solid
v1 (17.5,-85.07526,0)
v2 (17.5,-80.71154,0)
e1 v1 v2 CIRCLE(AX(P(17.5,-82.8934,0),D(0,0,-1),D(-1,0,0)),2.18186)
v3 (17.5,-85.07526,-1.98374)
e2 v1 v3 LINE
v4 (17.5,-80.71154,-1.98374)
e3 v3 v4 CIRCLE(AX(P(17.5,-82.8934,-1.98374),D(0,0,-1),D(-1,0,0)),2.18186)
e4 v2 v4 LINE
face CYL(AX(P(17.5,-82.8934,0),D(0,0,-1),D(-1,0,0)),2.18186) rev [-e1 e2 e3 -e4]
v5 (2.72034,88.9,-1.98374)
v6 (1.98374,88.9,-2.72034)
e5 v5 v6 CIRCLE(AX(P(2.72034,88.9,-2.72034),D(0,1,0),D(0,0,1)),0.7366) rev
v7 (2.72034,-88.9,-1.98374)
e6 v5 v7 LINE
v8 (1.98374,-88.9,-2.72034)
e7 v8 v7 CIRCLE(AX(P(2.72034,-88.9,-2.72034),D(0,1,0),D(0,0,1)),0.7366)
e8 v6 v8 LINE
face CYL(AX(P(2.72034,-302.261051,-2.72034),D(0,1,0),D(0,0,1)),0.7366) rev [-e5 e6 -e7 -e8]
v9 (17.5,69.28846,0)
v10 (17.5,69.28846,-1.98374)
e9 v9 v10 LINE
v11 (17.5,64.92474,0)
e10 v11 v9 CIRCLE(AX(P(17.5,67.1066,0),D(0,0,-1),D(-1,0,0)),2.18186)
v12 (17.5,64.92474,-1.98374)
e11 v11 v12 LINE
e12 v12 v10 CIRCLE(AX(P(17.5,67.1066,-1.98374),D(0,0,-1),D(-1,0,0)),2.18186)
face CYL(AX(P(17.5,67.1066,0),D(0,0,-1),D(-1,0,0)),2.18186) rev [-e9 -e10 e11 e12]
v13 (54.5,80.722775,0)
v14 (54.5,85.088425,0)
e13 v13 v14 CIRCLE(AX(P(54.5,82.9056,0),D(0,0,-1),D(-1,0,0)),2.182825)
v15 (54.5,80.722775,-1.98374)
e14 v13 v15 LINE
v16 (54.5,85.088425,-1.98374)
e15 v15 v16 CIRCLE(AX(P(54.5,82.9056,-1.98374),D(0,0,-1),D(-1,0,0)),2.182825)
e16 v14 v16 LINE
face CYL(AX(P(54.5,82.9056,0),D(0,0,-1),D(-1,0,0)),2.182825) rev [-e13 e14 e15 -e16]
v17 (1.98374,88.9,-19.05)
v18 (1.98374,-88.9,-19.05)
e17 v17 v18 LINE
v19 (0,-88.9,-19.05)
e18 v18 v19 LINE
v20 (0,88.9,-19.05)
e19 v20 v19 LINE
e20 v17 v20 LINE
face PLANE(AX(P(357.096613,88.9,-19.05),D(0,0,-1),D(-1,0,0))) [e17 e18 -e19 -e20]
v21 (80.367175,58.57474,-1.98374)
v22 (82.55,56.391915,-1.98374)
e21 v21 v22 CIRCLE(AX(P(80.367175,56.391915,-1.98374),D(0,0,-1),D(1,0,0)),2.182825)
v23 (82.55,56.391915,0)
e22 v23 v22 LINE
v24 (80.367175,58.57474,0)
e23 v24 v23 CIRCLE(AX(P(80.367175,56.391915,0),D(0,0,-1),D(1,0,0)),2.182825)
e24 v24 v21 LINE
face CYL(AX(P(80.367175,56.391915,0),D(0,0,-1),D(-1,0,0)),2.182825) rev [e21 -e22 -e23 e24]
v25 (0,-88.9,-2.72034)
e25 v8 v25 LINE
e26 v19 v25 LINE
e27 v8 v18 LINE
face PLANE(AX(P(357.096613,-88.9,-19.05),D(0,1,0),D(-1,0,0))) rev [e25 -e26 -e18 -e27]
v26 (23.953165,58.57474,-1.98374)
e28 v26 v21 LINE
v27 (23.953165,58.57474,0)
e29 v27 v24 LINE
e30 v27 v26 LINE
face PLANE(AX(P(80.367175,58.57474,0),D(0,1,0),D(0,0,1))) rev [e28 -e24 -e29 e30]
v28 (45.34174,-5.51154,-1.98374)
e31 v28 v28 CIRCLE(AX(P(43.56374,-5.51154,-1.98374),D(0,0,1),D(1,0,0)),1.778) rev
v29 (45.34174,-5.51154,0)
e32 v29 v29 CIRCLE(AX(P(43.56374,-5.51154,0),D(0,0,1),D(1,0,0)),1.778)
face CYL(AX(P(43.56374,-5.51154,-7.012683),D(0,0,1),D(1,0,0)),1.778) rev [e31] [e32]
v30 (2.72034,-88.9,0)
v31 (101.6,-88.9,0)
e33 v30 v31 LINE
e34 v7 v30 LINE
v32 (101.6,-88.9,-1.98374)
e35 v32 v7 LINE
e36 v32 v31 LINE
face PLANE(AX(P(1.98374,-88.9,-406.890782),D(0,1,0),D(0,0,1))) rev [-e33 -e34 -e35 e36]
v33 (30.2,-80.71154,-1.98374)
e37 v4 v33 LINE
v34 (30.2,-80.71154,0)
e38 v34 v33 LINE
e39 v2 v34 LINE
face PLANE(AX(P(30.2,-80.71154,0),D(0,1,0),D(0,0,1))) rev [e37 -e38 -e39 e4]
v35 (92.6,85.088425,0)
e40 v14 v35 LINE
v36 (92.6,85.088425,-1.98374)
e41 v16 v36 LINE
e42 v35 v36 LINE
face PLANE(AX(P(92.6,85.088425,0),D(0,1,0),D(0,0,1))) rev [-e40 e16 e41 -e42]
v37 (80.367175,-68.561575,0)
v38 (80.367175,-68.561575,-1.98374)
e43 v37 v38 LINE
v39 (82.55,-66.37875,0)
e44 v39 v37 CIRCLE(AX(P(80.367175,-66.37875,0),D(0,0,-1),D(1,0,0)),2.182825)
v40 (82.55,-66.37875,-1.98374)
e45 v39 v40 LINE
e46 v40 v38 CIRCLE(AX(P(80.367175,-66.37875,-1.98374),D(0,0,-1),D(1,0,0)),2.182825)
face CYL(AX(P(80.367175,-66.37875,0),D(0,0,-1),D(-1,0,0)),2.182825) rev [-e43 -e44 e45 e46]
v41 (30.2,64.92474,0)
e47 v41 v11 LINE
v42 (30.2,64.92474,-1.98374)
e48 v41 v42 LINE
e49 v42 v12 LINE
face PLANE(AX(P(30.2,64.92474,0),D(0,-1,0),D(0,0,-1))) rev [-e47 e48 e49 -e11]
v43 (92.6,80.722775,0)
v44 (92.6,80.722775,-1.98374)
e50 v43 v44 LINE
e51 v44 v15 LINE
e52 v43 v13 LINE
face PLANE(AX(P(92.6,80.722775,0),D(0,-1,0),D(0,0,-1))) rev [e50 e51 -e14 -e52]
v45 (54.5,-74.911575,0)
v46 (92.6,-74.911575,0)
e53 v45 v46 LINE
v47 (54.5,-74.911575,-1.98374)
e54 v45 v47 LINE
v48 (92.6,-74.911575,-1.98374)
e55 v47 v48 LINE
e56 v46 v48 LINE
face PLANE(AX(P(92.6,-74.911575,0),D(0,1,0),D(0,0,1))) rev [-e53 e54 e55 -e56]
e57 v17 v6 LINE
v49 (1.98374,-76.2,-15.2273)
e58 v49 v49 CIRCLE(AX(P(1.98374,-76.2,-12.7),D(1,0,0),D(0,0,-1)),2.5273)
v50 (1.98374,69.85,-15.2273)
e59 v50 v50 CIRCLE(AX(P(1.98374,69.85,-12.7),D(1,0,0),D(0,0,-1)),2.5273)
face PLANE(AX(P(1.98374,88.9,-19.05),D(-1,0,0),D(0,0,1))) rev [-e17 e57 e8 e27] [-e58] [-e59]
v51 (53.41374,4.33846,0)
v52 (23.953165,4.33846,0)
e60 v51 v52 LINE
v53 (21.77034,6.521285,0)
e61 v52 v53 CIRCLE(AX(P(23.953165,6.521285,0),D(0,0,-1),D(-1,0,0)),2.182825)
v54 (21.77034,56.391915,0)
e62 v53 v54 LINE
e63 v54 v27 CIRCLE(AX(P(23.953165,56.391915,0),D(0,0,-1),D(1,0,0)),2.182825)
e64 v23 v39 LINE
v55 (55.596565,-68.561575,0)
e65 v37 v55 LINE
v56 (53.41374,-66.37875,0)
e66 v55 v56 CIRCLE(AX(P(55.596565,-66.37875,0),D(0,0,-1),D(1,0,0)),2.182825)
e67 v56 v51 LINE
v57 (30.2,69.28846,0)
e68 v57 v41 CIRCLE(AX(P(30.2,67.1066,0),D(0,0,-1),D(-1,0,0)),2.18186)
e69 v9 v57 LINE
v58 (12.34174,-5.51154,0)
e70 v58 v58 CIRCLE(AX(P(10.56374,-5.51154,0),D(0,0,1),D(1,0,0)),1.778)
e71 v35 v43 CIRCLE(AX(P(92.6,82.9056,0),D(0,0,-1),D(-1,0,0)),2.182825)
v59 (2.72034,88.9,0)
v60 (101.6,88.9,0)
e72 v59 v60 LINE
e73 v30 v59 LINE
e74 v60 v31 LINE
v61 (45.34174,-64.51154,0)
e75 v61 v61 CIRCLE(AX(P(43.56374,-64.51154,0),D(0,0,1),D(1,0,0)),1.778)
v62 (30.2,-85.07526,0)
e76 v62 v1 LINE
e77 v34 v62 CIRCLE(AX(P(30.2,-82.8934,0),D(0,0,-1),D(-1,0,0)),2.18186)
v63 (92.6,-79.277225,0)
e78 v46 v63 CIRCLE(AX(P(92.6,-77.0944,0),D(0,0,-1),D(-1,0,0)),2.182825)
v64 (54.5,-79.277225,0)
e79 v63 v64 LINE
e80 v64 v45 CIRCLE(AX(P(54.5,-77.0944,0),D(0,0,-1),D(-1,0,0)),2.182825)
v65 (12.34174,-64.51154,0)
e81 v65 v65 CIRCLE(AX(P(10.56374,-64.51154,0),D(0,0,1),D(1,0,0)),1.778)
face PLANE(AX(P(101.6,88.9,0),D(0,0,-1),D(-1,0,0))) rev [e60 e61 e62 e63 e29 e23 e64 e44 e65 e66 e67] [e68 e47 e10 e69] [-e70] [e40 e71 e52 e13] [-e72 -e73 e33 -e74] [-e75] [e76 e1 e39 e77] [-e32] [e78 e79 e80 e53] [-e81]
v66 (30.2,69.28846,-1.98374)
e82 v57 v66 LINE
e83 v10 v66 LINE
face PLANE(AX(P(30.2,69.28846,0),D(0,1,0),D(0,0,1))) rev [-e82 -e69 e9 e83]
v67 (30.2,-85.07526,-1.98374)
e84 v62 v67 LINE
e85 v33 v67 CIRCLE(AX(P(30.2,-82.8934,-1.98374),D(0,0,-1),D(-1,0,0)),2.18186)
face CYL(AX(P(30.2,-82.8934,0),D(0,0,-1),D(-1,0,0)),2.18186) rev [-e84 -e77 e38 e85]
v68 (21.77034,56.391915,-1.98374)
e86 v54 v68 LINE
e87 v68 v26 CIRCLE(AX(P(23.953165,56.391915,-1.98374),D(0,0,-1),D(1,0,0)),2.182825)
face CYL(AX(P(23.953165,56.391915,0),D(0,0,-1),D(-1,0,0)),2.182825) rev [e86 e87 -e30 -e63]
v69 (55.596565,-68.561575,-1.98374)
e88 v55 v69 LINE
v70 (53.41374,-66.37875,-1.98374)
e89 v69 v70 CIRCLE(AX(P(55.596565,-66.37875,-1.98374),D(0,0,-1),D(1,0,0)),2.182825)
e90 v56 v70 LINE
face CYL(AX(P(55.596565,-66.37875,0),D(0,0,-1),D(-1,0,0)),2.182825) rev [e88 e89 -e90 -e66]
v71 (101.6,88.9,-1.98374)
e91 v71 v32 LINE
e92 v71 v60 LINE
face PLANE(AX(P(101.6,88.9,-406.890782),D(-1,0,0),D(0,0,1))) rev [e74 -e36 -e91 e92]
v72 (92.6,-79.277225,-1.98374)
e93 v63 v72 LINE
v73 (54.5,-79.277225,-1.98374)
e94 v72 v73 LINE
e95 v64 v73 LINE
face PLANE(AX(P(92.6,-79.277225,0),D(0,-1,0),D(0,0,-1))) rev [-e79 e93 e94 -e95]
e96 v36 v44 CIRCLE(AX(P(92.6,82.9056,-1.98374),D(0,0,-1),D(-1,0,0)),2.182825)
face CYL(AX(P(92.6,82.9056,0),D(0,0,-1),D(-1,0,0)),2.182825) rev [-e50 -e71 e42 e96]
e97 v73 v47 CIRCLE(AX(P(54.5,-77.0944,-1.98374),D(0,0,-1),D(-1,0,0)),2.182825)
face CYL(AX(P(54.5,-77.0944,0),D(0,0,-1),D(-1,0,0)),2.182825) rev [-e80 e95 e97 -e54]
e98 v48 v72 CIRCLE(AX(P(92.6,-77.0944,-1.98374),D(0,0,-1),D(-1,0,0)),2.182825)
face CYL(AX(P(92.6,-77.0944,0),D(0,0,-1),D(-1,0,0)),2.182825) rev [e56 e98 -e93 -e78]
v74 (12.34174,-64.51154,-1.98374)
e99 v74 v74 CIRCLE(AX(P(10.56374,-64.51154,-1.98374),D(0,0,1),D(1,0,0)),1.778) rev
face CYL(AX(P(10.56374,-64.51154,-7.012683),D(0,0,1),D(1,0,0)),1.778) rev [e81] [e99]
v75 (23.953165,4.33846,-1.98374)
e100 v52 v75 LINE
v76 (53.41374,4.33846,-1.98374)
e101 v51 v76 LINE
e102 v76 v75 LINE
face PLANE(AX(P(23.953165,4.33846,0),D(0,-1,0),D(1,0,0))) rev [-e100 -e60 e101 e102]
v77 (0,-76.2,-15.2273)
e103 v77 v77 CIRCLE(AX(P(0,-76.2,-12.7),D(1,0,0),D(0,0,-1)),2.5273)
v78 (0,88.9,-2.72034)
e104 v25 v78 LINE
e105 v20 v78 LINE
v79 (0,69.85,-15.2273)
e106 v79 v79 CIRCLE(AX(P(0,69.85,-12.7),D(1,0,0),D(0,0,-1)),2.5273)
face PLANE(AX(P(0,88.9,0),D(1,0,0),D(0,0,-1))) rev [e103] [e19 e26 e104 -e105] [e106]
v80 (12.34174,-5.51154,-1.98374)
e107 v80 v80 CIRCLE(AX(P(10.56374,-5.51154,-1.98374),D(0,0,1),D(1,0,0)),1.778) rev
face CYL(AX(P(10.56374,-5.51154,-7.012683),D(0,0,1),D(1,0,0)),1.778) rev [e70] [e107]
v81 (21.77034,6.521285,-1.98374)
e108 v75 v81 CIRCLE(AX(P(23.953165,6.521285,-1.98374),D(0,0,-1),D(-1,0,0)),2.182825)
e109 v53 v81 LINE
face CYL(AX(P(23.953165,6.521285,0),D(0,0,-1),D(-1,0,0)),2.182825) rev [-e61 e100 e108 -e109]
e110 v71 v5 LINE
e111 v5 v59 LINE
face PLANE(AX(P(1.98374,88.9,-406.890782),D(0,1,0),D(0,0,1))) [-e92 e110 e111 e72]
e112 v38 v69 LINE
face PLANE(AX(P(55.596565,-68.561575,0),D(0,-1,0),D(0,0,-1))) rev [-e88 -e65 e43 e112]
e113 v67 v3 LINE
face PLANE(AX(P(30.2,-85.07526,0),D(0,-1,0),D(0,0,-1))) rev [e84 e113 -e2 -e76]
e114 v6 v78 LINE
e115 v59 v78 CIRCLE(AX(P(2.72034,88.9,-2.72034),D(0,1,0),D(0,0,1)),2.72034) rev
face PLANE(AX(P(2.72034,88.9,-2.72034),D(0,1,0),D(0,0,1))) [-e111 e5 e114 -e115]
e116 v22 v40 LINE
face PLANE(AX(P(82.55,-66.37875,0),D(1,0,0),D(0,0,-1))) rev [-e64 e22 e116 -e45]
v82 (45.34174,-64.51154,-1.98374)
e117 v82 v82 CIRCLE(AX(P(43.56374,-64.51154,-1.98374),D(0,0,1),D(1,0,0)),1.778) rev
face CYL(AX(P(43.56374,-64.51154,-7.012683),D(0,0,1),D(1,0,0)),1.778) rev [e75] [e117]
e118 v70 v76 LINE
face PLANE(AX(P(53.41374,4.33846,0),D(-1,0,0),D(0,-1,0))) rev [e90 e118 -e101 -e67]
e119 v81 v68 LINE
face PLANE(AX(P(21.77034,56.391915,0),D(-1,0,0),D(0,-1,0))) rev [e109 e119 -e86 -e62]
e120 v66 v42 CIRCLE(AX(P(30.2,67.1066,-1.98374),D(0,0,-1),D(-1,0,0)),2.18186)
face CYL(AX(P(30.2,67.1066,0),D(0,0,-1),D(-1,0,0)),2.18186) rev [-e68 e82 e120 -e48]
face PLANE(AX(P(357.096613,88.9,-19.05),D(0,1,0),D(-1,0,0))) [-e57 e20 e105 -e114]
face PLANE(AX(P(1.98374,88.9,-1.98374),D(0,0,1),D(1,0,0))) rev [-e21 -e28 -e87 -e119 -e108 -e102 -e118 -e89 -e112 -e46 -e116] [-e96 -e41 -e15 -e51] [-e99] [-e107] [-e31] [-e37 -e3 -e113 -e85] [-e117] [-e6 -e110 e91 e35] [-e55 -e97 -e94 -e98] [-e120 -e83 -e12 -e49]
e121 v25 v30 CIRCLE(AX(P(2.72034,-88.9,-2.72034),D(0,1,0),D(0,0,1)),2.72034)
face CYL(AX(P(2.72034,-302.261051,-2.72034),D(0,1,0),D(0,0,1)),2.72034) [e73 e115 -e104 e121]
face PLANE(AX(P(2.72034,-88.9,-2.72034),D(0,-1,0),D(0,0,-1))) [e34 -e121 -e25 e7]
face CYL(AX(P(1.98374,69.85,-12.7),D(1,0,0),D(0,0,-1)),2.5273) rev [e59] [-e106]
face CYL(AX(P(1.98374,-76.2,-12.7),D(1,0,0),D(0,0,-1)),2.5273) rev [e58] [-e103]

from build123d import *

# Parameters (mm, degrees)
BOSS_EXTRUDE1_DEPTH        = 88.9
FLATTEN_BENDS1_START       = -88.9
FLATTEN_BENDS1_OUTLINE_W   = 1.98374
FLATTEN_BENDS1_OUTLINE_H   = 17.06626
FLATTEN_BENDS1_DEPTH       = 177.8
FLATTEN_BENDS1_2_OUTLINE_W = 16.324394327
FLATTEN_BENDS1_2_OUTLINE_H = 1.98374
FLATTEN_BENDS1_2_DEPTH     = 177.8
PROCESS_BENDS1_START       = -88.9
PROCESS_BENDS1_DEPTH       = 177.8
PROCESS_BENDS1_2_DEPTH     = 177.8
CUT_EXTRUDE1_DEPTH         = 137.077284035
F_8_0_199_DIAMETER_HOLE1_D = 5.0546
SKETCH14_R                 = 1.778
CUT_EXTRUDE2_DEPTH         = 1.98374


# Read off the part's stored shape, not the designer's step: Flatten-Bends1, Process-Bends1
with BuildPart() as part:
    # Sketch1 → Boss-Extrude1 (new, symmetric)
    with BuildSketch(Plane(origin=(0, 0, 0), x_dir=(1, 0, 0), z_dir=(0, 1, 0))):
        Polygon((0, 0), (0, 19.05), (1.98374, 19.05), (1.98374, 1.98374), (101.6, 1.98374), (101.6, 0), align=None)
    extrude(amount=BOSS_EXTRUDE1_DEPTH, both=True)

    # Flatten-Bends1 outline → Flatten-Bends1 (cut)
    with BuildSketch(Plane(origin=(0, 0, 0), x_dir=(1, 0, 0), z_dir=(0, 1, 0)).offset(FLATTEN_BENDS1_START)):
        with Locations((0.99187, 10.51687)):
            Rectangle(FLATTEN_BENDS1_OUTLINE_W, FLATTEN_BENDS1_OUTLINE_H)
    extrude(amount=FLATTEN_BENDS1_DEPTH, mode=Mode.SUBTRACT)

    # Flatten-Bends1 2 outline → Flatten-Bends1 2 (add)
    with BuildSketch(Plane(origin=(0, 0, 0), x_dir=(1, 0, 0), z_dir=(0, 1, 0)).offset(FLATTEN_BENDS1_START)):
        with Locations((-8.162197164, 0.99187)):
            Rectangle(FLATTEN_BENDS1_2_OUTLINE_W, FLATTEN_BENDS1_2_OUTLINE_H)
    extrude(amount=FLATTEN_BENDS1_2_DEPTH)

    # Process-Bends1 outline → Process-Bends1 (cut)
    with BuildSketch(Plane(origin=(0, 0, 0), x_dir=(1, 0, 0), z_dir=(0, 1, 0)).offset(PROCESS_BENDS1_START)):
        with BuildLine():
            ThreePointArc((2.72034, 0), (1.077712947, 0.551924431), (0.101624637, 1.98374))
            Line((0.101624637, 1.98374), (-16.324394327, 1.98374))
            Line((-16.324394327, 1.98374), (-16.324394327, 0))
            Line((-16.324394327, 0), (2.72034, 0))
        make_face()
    extrude(amount=PROCESS_BENDS1_DEPTH, mode=Mode.SUBTRACT)

    # Process-Bends1 2 outline → Process-Bends1 2 (add)
    with BuildSketch(Plane(origin=(0, 0, 0), x_dir=(1, 0, 0), z_dir=(0, 1, 0)).offset(PROCESS_BENDS1_START)):
        with BuildLine():
            Line((1.98374, 2.72034), (1.98374, 19.05))
            Line((1.98374, 19.05), (0, 19.05))
            Line((0, 19.05), (0, 2.72034))
            ThreePointArc((0, 2.72034), (0.025525919, 2.348551375), (0.101624637, 1.98374))
            Line((0.101624637, 1.98374), (2.72034, 1.98374))
            ThreePointArc((2.72034, 1.98374), (2.199485145, 2.199485145), (1.98374, 2.72034))
        make_face()
    extrude(amount=PROCESS_BENDS1_2_DEPTH)

    # Sketch6 → Cut-Extrude1 (cut, through all)
    with BuildSketch(Plane(origin=(0, 0, -1.98374), x_dir=(-1, 0, 0), z_dir=(0, 0, -1))):
        with BuildLine():
            Line((-92.60000004, -74.9115748), (-54.50000004, -74.9115748))
            ThreePointArc((-54.50000004, -74.9115748), (-52.31717484, -77.0944), (-54.50000004, -79.2772252))
            Line((-54.50000004, -79.2772252), (-92.60000004, -79.2772252))
            ThreePointArc((-92.60000004, -79.2772252), (-94.78282524, -77.0944), (-92.60000004, -74.9115748))
        make_face()
        with BuildLine():
            Line((-92.60000004, 85.0884252), (-54.50000004, 85.0884252))
            ThreePointArc((-54.50000004, 85.0884252), (-52.31717484, 82.9056), (-54.50000004, 80.7227748))
            Line((-54.50000004, 80.7227748), (-92.60000004, 80.7227748))
            ThreePointArc((-92.60000004, 80.7227748), (-94.78282524, 82.9056), (-92.60000004, 85.0884252))
        make_face()
        with BuildLine():
            Line((-30.2, 69.28846), (-17.5, 69.28846))
            ThreePointArc((-17.5, 69.28846), (-15.31814, 67.1066), (-17.5, 64.92474))
            Line((-17.5, 64.92474), (-30.2, 64.92474))
            ThreePointArc((-30.2, 64.92474), (-32.38186, 67.1066), (-30.2, 69.28846))
        make_face()
        with BuildLine():
            Line((-30.2, -80.71154), (-17.5, -80.71154))
            ThreePointArc((-17.5, -80.71154), (-15.31814, -82.8934), (-17.5, -85.07526))
            Line((-17.5, -85.07526), (-30.2, -85.07526))
            ThreePointArc((-30.2, -85.07526), (-32.38186, -82.8934), (-30.2, -80.71154))
        make_face()
        with BuildLine():
            Line((-23.9531652, 4.33846), (-53.41374, 4.33846))
            Line((-53.41374, 4.33846), (-53.41374, -66.3787496))
            ThreePointArc((-53.41374, -66.3787496), (-54.053074699, -67.922240101), (-55.5965652, -68.5615748))
            Line((-55.5965652, -68.5615748), (-80.3671748, -68.5615748))
            ThreePointArc((-80.3671748, -68.5615748), (-81.910665301, -67.922240101), (-82.55, -66.3787496))
            Line((-82.55, -66.3787496), (-82.55, 56.3919148))
            ThreePointArc((-82.55, 56.3919148), (-81.910665301, 57.935405301), (-80.3671748, 58.57474))
            Line((-80.3671748, 58.57474), (-23.9531652, 58.57474))
            ThreePointArc((-23.9531652, 58.57474), (-22.409674699, 57.935405301), (-21.77034, 56.3919148))
            Line((-21.77034, 56.3919148), (-21.77034, 6.5212852))
            ThreePointArc((-21.77034, 6.5212852), (-22.409674699, 4.977794699), (-23.9531652, 4.33846))
        make_face()
    extrude(amount=-CUT_EXTRUDE1_DEPTH, mode=Mode.SUBTRACT)

    # #8 (0.199) Diameter Hole1 (through all)
    with Locations(Plane(origin=(1.98374, 0, 0), x_dir=(0, 0, -1), z_dir=(1, 0, 0))):
        with Locations((12.7, 69.85), (12.7, -76.2)):
            Hole(F_8_0_199_DIAMETER_HOLE1_D / 2)

    # Sketch14 → Cut-Extrude2 (cut)
    with BuildSketch(Plane.XY):
        with Locations((10.56374, -5.51154)):
            Circle(SKETCH14_R)
        with Locations((43.56374, -5.51154)):
            Circle(SKETCH14_R)
        with Locations((10.56374, -64.51154)):
            Circle(SKETCH14_R)
        with Locations((43.56374, -64.51154)):
            Circle(SKETCH14_R)
    extrude(amount=-CUT_EXTRUDE2_DEPTH, mode=Mode.SUBTRACT)


solid = part.part
